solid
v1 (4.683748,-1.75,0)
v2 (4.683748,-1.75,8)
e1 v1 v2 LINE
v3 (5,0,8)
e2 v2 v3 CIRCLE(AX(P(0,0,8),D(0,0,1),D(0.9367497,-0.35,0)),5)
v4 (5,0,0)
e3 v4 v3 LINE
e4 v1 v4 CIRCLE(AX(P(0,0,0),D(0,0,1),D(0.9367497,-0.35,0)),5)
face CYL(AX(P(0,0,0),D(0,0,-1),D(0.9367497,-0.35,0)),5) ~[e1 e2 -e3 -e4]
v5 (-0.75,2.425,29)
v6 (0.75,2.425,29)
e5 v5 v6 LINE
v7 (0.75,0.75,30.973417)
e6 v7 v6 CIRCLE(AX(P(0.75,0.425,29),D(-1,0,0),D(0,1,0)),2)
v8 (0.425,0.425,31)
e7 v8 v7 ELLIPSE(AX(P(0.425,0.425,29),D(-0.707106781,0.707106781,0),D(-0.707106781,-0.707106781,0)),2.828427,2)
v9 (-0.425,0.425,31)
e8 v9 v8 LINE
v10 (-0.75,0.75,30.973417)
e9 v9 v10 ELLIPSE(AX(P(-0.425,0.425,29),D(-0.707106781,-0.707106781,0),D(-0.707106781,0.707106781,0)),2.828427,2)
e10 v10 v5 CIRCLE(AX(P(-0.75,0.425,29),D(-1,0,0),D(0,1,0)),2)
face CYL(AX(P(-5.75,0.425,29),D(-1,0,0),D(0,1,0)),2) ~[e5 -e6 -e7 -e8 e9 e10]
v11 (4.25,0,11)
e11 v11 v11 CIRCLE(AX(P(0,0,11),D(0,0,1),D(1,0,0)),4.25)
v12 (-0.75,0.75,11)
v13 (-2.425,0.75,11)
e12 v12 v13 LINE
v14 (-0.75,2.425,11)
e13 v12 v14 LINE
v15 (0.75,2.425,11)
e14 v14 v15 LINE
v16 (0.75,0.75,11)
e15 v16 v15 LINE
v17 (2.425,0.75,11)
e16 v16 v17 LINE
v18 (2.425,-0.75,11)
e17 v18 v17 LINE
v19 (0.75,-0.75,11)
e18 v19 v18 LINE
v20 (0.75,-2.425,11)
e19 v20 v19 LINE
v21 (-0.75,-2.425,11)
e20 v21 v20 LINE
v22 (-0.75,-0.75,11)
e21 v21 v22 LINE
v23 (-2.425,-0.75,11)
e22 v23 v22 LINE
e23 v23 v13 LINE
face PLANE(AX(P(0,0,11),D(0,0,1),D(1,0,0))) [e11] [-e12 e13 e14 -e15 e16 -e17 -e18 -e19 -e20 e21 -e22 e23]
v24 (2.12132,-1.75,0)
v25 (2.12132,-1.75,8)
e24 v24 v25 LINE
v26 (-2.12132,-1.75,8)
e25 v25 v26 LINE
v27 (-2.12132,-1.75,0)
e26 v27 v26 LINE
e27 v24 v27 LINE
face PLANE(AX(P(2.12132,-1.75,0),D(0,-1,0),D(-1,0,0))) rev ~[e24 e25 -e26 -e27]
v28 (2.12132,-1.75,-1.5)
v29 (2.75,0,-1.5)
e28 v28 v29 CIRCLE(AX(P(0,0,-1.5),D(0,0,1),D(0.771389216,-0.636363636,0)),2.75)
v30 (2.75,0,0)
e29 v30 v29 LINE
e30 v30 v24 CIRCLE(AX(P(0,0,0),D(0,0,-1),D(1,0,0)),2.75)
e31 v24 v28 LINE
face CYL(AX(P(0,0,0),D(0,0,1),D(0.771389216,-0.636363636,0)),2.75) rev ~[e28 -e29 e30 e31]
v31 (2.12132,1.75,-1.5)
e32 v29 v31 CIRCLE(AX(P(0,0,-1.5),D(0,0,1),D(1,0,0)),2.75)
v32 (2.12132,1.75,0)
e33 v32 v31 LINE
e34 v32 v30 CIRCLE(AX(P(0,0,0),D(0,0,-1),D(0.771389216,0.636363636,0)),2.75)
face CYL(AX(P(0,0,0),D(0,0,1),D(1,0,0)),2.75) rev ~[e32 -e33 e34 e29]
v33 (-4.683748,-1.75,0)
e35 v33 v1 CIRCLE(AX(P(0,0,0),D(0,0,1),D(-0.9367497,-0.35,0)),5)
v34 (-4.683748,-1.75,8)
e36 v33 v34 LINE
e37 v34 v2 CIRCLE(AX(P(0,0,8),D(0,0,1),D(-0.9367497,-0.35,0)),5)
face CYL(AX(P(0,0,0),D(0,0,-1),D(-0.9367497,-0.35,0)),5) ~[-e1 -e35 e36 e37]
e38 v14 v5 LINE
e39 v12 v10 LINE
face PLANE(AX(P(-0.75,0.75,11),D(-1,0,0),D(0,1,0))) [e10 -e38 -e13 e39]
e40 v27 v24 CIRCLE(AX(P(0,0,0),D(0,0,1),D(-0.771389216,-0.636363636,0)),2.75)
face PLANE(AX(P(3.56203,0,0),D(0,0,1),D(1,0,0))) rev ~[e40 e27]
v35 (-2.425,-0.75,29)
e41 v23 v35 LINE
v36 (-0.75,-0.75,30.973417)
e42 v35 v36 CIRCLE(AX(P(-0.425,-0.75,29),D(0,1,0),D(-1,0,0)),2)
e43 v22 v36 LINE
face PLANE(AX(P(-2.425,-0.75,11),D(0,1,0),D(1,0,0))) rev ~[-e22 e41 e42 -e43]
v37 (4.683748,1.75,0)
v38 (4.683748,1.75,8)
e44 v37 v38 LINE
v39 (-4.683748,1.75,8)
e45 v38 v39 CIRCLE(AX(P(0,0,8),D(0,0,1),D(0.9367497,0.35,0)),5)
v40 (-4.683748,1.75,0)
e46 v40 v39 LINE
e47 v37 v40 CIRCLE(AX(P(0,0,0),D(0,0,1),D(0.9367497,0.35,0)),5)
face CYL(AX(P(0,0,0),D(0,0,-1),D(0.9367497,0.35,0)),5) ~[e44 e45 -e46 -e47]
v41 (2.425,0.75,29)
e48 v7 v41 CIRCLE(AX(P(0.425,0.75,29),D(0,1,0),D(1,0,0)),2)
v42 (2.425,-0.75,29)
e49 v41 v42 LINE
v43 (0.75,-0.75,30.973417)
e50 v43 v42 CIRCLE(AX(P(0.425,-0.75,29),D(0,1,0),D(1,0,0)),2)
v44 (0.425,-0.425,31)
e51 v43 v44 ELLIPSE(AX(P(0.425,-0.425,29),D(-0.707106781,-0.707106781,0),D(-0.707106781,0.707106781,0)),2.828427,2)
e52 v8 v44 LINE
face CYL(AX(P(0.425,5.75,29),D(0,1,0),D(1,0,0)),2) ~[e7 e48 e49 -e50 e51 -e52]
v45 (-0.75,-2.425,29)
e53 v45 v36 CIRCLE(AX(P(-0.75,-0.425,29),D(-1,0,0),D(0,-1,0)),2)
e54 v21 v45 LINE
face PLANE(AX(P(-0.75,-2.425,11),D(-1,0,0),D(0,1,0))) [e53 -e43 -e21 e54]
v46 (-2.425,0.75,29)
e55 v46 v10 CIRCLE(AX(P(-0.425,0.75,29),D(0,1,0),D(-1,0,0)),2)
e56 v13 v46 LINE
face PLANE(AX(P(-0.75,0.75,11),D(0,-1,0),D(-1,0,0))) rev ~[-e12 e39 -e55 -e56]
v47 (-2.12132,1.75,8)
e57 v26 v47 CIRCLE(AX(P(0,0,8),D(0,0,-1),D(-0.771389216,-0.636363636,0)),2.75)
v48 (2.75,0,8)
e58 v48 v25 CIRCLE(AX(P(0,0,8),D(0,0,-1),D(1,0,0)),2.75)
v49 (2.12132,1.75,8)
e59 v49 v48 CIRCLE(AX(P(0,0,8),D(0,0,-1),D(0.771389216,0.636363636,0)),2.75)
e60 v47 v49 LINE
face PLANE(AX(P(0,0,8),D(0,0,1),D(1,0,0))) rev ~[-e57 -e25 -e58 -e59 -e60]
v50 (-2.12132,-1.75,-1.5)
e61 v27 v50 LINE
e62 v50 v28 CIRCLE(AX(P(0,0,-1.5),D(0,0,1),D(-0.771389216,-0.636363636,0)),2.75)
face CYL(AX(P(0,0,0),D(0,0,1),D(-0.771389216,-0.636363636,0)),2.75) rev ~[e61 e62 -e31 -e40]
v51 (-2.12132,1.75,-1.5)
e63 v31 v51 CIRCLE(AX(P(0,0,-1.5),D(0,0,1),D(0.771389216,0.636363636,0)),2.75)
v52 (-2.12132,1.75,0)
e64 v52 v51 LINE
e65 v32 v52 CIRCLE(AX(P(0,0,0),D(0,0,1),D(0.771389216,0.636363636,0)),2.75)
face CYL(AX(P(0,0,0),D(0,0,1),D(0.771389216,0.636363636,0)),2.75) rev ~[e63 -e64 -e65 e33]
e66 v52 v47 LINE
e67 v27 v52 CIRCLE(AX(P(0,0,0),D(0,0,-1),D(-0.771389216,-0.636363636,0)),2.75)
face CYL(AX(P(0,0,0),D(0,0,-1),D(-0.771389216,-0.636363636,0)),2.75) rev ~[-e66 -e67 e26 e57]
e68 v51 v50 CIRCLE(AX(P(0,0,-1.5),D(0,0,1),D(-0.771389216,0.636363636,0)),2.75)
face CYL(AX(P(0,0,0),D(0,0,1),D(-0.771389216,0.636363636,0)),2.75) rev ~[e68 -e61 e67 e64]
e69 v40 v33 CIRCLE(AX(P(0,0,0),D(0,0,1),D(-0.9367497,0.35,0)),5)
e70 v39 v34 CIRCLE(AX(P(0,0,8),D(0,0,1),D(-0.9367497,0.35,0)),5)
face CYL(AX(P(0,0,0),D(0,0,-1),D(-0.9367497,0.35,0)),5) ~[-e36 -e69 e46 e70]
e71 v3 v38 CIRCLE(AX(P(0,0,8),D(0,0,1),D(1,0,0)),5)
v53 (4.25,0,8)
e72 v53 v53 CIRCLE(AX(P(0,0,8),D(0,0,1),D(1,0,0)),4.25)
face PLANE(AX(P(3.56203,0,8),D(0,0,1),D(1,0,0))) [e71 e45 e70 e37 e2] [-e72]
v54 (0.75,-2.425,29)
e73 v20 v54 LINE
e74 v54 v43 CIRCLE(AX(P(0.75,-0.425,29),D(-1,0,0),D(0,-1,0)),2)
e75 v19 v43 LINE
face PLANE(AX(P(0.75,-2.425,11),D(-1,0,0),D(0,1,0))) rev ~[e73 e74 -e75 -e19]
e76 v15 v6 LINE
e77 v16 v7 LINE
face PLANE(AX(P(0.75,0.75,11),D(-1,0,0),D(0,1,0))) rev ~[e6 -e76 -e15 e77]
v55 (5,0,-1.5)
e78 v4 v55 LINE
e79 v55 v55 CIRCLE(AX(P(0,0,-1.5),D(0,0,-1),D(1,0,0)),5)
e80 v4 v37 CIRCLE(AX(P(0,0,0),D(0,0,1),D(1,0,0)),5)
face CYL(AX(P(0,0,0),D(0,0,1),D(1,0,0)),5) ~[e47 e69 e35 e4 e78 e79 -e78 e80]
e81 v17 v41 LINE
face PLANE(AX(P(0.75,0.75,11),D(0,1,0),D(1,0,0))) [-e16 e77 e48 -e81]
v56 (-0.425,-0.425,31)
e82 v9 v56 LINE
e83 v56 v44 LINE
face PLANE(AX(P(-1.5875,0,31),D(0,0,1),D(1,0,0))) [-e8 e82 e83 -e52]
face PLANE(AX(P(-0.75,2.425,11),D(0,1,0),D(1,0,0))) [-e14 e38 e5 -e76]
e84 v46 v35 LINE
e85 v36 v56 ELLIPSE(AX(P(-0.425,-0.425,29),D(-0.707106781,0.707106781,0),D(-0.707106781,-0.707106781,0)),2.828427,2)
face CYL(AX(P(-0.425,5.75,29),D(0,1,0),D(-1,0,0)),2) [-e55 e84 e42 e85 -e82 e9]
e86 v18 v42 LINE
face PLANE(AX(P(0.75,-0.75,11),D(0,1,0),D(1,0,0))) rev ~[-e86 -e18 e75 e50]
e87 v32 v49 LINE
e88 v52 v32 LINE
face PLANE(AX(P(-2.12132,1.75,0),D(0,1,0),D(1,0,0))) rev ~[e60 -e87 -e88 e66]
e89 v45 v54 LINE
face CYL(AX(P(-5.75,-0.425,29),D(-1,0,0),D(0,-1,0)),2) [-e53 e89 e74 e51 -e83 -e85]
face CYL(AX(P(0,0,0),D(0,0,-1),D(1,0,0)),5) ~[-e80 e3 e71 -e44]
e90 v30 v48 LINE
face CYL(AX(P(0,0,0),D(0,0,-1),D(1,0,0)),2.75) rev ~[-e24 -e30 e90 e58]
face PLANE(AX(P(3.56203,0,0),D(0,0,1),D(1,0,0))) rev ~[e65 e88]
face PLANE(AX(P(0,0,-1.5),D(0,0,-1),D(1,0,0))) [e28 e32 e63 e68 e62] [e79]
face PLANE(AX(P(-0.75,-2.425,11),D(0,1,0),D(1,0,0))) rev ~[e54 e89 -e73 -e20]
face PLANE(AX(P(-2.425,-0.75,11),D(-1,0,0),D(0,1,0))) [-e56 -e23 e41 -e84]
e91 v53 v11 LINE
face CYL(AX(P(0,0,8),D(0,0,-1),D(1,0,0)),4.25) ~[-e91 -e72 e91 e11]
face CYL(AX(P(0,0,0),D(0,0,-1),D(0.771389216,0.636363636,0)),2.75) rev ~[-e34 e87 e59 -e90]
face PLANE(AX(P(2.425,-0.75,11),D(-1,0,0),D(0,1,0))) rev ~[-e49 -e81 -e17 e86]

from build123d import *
from build123d import SkipClean  # not in build123d's __all__

# Parameters (mm, degrees)
F1_DEPTH    = 8
F2_R        = 4.25
F3_DEPTH    = 3
F4_W        = 1.675
F4_H        = 1.5
F4_W_2      = 1.5
F4_H_2      = 1.675
F5_DEPTH    = 20
F6_T1_DEPTH = 11.5
F6_T3_DEPTH = 11.5
F7_R        = 5
F8_DEPTH    = 1.5


# Not quite as in the source:
# - a fillet or chamfer that OpenCascade refuses, or shapes differently, is made with other operations: its cross-section is extruded or revolved along the edge and cut away or added


with BuildPart() as f1:
    # F0 (on Top) → F1 (new body)
    with BuildSketch(Plane.XY):
        with BuildLine():
            ThreePointArc((4.6837484988, -1.75), (4.9203019467, -0.8891730726), (5, 0))
            ThreePointArc((5, 0), (4.9203019467, 0.8891730726), (4.6837484988, 1.75))
            Line((4.6837484988, 1.75), (2.1213203436, 1.75))
            ThreePointArc((2.1213203436, 1.75), (2.5880621075, 0.9297497123), (2.75, 0))
            ThreePointArc((2.75, 0), (2.5880621075, -0.9297497123), (2.1213203436, -1.75))
            Line((2.1213203436, -1.75), (4.6837484988, -1.75))
        make_face()
        with BuildLine():
            Line((2.1213203436, 1.75), (4.6837484988, 1.75))
            ThreePointArc((4.6837484988, 1.75), (0, 5), (-4.6837484988, 1.75))
            Line((-4.6837484988, 1.75), (-2.1213203436, 1.75))
            ThreePointArc((-2.1213203436, 1.75), (0, 2.75), (2.1213203436, 1.75))
        make_face()
        with BuildLine():
            ThreePointArc((-4.6837484988, -1.75), (0, -5), (4.6837484988, -1.75))
            Line((4.6837484988, -1.75), (2.1213203436, -1.75))
            ThreePointArc((2.1213203436, -1.75), (0, -2.75), (-2.1213203436, -1.75))
            Line((-2.1213203436, -1.75), (-4.6837484988, -1.75))
        make_face()
        with BuildLine():
            Line((-2.1213203436, 1.75), (-4.6837484988, 1.75))
            ThreePointArc((-4.6837484988, 1.75), (-5, 0), (-4.6837484988, -1.75))
            Line((-4.6837484988, -1.75), (-2.1213203436, -1.75))
            ThreePointArc((-2.1213203436, -1.75), (-2.75, 0), (-2.1213203436, 1.75))
        make_face()
        with BuildLine():
            Line((-2.1213203436, 1.75), (2.1213203436, 1.75))
            ThreePointArc((2.1213203436, 1.75), (0, 2.75), (-2.1213203436, 1.75))
        make_face()
        with BuildLine():
            ThreePointArc((-2.1213203436, -1.75), (0, -2.75), (2.1213203436, -1.75))
            Line((2.1213203436, -1.75), (-2.1213203436, -1.75))
        make_face()
    extrude(amount=F1_DEPTH)

    # F2 (on face) → F3 (join)
    with BuildSketch(Plane.XY.offset(8)):
        Circle(F2_R)
    extrude(amount=F3_DEPTH)

    # F4 (on face) → F5 (join)
    with BuildSketch(Plane.XY.offset(11)):
        with Locations((-1.5875, 0)):
            Rectangle(F4_W, F4_H)
        Rectangle(F4_W_2, F4_H)
        with Locations((0, 1.5875)):
            Rectangle(F4_W_2, F4_H_2)
        with Locations((1.5875, 0)):
            Rectangle(F4_W, F4_H)
        with Locations((0, -1.5875)):
            Rectangle(F4_W_2, F4_H_2)
    extrude(amount=F5_DEPTH)

    # F6: fillet of radius 2 on 4 edges, made by hand

    # F6_s2 → F6_t1 (cut)
    with BuildSketch(Plane.YZ.offset(-5.75)):
        with BuildLine():
            ThreePointArc((2.425, 29), (1.8392135624, 30.4142135624), (0.425, 31))
            Line((0.425, 31), (2.425, 31))
            Line((2.425, 31), (2.425, 29))
        make_face()
        with BuildLine():
            ThreePointArc((-2.425, 29), (-1.8392135624, 30.4142135624), (-0.425, 31))
            Line((-0.425, 31), (-2.425, 31))
            Line((-2.425, 31), (-2.425, 29))
        make_face()
    extrude(amount=F6_T1_DEPTH, mode=Mode.SUBTRACT)

    # F6_s4 → F6_t3 (cut)
    with BuildSketch(Plane.XZ.offset(-5.75)):
        with BuildLine():
            ThreePointArc((2.425, 29), (1.8392135624, 30.4142135624), (0.425, 31))
            Line((0.425, 31), (2.425, 31))
            Line((2.425, 31), (2.425, 29))
        make_face()
        with BuildLine():
            ThreePointArc((-2.425, 29), (-1.8392135624, 30.4142135624), (-0.425, 31))
            Line((-0.425, 31), (-2.425, 31))
            Line((-2.425, 31), (-2.425, 29))
        make_face()
    extrude(amount=F6_T3_DEPTH, mode=Mode.SUBTRACT)

    # F7 (on face) → F8 (join)
    with BuildSketch(Plane(origin=(0, 0, 0), x_dir=(1, 0, 0), z_dir=(0, 0, -1))):
        Circle(F7_R)
        with BuildLine():
            ThreePointArc((2.1213203436, 1.75), (2.5880621075, 0.9297497123), (2.75, 0))
            ThreePointArc((2.75, 0), (2.5880621075, -0.9297497123), (2.1213203436, -1.75))
            ThreePointArc((2.1213203436, -1.75), (0, -2.75), (-2.1213203436, -1.75))
            ThreePointArc((-2.1213203436, -1.75), (-2.75, 0), (-2.1213203436, 1.75))
            ThreePointArc((-2.1213203436, 1.75), (0, 2.75), (2.1213203436, 1.75))
        make_face(mode=Mode.SUBTRACT)
    with SkipClean():  # cleaning this boolean's faces spoils the solid; the shape is the same uncleaned
        extrude(amount=F8_DEPTH)


solid = f1.part
